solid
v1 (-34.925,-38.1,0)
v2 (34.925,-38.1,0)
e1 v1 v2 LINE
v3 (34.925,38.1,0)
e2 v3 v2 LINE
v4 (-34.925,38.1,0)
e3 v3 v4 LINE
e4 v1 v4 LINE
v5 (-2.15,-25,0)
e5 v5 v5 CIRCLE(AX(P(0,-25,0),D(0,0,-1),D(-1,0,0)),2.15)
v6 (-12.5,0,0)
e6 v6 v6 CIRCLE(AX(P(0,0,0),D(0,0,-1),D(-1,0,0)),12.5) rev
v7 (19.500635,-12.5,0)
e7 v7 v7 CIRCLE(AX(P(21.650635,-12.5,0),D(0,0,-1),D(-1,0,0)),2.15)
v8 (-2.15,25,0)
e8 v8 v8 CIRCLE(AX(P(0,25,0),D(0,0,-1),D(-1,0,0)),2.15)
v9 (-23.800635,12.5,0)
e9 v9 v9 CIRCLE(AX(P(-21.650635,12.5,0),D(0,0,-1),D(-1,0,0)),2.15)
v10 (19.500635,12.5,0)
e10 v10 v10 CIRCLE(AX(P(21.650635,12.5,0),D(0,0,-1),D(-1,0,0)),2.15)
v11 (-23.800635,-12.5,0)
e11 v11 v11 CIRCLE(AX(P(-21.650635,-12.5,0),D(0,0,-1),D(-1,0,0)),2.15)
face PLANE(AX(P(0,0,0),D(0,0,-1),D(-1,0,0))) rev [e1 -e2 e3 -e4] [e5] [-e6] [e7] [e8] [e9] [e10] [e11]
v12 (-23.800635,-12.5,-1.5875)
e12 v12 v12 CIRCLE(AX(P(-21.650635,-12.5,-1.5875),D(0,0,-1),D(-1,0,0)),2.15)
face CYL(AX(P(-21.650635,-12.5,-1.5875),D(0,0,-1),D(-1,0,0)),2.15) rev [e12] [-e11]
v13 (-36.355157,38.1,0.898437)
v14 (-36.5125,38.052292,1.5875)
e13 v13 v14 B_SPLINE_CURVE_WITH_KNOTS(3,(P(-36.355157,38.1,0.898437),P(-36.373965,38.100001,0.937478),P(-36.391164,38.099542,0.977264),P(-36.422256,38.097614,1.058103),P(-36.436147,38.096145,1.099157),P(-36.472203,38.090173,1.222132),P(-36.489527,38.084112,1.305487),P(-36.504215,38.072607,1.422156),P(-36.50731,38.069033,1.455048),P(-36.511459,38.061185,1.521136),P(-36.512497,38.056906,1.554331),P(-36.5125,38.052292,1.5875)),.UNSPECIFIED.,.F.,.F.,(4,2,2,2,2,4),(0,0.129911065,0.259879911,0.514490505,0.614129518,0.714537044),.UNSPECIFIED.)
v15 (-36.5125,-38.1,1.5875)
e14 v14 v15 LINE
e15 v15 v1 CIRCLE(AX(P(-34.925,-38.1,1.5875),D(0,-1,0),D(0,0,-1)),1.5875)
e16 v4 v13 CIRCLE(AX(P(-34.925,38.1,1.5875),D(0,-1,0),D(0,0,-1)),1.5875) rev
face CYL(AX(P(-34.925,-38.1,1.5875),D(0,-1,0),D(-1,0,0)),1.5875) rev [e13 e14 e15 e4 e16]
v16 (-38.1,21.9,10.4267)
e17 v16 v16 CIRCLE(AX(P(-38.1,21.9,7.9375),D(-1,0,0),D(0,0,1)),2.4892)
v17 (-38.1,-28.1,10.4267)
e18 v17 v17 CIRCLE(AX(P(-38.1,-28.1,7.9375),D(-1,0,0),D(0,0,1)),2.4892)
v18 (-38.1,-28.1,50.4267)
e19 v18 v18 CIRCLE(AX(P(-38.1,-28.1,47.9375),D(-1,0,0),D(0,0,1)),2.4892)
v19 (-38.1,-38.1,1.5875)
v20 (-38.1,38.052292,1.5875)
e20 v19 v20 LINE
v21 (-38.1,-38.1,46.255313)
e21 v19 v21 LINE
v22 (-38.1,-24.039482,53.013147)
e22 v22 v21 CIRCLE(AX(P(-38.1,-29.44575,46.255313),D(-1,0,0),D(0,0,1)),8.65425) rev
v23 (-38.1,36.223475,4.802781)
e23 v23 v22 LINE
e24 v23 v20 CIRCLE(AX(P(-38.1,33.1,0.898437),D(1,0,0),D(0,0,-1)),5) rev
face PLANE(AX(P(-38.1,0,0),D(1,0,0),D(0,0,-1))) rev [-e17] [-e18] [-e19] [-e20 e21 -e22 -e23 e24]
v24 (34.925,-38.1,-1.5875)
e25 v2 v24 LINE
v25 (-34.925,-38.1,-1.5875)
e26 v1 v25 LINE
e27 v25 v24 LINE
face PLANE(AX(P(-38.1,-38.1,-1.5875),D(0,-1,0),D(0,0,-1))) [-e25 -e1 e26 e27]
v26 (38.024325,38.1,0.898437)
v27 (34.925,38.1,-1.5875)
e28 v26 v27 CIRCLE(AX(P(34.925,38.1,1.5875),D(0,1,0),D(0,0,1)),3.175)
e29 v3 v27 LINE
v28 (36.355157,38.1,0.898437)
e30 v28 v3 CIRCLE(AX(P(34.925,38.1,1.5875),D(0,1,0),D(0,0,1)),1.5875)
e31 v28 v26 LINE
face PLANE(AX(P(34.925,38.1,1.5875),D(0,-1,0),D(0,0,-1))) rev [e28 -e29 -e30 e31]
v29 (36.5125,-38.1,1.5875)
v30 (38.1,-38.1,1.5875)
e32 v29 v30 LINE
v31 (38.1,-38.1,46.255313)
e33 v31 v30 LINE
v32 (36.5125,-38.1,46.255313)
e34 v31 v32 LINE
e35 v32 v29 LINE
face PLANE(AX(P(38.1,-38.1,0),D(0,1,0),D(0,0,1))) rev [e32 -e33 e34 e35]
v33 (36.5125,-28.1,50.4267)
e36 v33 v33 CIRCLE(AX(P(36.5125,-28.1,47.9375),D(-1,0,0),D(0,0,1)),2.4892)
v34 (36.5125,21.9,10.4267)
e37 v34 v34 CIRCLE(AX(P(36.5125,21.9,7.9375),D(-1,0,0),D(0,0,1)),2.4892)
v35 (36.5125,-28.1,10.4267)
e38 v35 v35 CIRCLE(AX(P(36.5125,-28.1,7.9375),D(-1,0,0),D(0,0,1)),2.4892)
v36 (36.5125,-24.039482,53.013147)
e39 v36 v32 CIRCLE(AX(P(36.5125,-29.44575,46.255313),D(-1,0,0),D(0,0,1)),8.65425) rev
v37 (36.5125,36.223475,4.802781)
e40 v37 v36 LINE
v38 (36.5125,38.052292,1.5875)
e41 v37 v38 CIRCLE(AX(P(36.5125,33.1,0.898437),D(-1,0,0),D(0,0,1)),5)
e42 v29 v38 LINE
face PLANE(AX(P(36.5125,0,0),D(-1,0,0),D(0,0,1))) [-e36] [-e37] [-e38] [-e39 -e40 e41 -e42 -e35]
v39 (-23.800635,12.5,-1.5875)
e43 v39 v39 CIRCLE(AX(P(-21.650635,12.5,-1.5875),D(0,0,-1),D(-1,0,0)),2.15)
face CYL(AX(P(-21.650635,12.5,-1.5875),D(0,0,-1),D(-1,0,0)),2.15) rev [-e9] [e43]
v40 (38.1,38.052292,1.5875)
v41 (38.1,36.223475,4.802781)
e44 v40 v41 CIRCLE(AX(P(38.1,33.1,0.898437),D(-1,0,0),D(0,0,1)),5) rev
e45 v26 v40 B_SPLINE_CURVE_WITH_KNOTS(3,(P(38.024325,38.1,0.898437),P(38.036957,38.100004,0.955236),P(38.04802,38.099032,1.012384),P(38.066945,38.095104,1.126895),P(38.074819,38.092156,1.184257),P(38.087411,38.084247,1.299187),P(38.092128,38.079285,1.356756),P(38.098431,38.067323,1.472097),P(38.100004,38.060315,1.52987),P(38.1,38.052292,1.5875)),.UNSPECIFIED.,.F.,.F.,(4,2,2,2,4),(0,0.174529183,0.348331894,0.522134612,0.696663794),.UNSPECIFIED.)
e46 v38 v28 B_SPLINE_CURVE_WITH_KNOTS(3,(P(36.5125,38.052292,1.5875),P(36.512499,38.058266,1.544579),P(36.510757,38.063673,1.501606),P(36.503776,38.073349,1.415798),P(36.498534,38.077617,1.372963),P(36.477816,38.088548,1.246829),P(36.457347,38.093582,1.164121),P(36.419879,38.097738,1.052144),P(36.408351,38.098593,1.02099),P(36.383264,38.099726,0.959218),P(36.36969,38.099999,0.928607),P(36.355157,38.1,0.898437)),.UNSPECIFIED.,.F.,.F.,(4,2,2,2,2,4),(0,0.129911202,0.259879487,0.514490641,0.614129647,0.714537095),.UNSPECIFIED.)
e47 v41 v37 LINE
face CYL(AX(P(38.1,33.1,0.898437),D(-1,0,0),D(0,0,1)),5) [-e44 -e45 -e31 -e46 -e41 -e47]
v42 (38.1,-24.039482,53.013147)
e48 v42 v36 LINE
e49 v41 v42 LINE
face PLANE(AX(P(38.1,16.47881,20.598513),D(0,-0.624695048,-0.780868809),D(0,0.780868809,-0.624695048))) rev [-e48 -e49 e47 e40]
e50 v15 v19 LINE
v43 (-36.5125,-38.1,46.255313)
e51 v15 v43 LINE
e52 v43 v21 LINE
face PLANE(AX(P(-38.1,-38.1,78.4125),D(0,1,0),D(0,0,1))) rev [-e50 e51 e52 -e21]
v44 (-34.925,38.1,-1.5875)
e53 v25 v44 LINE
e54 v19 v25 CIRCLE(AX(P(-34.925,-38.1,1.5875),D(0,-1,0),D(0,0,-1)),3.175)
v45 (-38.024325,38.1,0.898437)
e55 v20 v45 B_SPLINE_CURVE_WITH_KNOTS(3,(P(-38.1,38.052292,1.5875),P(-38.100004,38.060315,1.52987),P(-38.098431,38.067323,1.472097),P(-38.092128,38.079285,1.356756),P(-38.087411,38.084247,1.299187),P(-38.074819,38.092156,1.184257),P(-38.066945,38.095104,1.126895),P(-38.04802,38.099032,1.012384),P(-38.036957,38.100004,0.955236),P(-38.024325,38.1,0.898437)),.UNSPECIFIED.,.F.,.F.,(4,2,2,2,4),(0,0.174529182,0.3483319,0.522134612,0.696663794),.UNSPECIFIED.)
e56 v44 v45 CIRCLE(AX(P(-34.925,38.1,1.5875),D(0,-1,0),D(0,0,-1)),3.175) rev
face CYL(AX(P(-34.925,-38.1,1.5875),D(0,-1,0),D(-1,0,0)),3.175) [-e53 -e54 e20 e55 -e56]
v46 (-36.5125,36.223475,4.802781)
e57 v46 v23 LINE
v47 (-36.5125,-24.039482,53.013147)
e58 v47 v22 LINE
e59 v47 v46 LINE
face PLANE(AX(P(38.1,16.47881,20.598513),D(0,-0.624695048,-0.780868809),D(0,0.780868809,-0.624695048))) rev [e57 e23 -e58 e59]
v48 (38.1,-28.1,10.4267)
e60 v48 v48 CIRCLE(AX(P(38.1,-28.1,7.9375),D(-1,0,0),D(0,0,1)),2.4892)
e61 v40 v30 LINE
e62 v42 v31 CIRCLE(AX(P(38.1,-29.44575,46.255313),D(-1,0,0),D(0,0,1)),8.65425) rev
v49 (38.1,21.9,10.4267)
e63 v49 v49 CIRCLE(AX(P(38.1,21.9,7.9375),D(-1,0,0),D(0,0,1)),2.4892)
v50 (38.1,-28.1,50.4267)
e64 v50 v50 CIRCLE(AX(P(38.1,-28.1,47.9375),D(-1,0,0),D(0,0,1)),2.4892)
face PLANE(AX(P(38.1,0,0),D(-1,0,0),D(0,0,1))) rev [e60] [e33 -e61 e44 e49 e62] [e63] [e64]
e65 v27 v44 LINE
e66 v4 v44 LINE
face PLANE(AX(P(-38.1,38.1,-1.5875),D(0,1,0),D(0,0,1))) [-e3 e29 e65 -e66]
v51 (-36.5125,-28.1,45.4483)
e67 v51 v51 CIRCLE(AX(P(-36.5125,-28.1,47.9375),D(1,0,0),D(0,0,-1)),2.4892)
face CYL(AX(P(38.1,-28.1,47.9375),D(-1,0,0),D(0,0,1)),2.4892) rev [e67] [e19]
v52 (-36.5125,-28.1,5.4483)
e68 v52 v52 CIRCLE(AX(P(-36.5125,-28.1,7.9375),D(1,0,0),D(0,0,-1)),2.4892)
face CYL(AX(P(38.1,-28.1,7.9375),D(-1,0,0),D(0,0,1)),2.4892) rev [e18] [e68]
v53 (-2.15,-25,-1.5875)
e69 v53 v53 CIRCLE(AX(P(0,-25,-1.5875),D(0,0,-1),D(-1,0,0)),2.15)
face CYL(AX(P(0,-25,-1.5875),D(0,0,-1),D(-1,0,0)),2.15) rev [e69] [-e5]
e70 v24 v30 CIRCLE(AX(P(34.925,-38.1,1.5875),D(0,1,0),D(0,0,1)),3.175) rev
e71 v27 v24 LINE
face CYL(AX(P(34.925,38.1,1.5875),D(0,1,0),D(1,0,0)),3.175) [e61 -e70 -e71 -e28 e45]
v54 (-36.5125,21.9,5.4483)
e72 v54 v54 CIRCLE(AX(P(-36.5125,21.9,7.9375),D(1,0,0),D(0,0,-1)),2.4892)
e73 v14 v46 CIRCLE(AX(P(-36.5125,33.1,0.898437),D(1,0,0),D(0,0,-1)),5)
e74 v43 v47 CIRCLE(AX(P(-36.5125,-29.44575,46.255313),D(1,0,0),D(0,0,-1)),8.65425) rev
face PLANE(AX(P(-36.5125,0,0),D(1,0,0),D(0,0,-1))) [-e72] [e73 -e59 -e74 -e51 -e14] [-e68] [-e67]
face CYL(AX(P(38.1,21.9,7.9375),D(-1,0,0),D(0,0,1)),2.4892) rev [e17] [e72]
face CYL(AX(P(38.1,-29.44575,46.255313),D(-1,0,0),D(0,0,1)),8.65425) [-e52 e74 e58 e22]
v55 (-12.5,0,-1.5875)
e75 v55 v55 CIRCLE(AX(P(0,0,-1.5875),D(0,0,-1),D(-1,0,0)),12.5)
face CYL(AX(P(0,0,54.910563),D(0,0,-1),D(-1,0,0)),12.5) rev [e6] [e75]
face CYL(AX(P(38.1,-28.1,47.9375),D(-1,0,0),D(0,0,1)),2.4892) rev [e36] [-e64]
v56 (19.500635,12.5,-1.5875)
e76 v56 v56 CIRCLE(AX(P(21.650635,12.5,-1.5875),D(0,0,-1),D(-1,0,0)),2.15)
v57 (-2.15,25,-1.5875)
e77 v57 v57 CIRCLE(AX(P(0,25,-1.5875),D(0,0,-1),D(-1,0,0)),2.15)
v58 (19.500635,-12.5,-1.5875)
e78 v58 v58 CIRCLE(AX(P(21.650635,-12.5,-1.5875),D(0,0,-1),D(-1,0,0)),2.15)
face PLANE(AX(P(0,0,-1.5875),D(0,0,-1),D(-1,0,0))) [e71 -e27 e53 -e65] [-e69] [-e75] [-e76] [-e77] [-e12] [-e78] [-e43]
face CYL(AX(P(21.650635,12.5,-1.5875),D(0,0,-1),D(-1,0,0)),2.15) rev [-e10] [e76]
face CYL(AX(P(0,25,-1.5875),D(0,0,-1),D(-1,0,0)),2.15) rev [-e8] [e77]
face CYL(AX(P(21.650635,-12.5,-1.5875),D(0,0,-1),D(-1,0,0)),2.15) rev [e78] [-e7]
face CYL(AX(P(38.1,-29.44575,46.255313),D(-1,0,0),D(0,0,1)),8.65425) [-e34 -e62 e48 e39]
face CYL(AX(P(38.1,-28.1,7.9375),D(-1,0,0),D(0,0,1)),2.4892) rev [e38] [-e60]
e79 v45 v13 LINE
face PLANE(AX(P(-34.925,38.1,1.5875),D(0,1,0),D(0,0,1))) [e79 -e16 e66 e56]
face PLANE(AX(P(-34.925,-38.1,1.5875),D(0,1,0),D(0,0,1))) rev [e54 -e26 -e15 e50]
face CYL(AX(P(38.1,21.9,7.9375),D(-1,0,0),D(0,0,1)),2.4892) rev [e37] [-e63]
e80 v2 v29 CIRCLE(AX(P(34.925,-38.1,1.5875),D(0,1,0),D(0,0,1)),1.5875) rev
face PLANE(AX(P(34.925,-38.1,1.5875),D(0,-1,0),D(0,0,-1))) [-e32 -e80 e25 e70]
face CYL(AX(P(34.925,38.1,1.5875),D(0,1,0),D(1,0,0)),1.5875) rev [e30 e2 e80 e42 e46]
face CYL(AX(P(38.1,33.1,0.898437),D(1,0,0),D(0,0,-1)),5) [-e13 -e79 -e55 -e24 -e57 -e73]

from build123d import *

# Parameters (mm, degrees)
SKETCH1_W                      = 76.2
SKETCH1_H                      = 76.2
BASE_FLANGE1_DEPTH             = 1.5875
EDGE_FLANGE1_STRIP_W           = 9.525
EDGE_FLANGE1_STRIP_H           = 1.5875
EDGE_FLANGE1_STRIP_CUT_DEPTH   = 76.2
EDGE_FLANGE1_STRIP_2_W         = 9.525
EDGE_FLANGE1_STRIP_2_H         = 1.5875
EDGE_FLANGE1_STRIP_CUT_2_DEPTH = 76.2
EDGE_FLANGE1_DEPTH             = 76.2
EDGE_FLANGE1_BEND_DEPTH        = 76.2
UOR23_ARM_2_P_002_START        = -73.139044615
UOR23_ARM_2_P_002_OUTLINE_R    = 2.4892
UOR23_ARM_2_P_002_OUTLINE_R_2  = 15.875
UOR23_ARM_2_P_002_OUTLINE_R_3  = 4.7625
UOR23_ARM_2_P_002_DEPTH        = 4.7625
BODY_MOVE_COPY2_ANGLE          = 90
SKETCH19_R                     = 2.4892
CUT_EXTRUDE1_DEPTH             = 116.786744303
CUT_EXTRUDE2_REACH             = 80.071
SKETCH21_R                     = 12.5
M4_CLEARANCE_HOLE1_D           = 4.3
CIRPATTERN1_COUNT              = 6
FILLET1_R                      = 5


with BuildPart() as part:
    # Base-Flange1: sheet metal written as solids
    # Sketch1 → Base-Flange1 (new body)
    with BuildSketch(Plane.XY):
        Rectangle(SKETCH1_W, SKETCH1_H)
    extrude(amount=-BASE_FLANGE1_DEPTH)

    # Edge-Flange1: sheet metal written as solids
    # Edge-Flange1 strip (on a plane across the edge) → Edge-Flange1 strip cut (cut)
    with BuildSketch(Plane(origin=(-38.1, 38.1, 0), x_dir=(1, 0, 0), z_dir=(0, -1, 0))):
        with Locations((-1.5875, -0.79375)):
            Rectangle(EDGE_FLANGE1_STRIP_W, EDGE_FLANGE1_STRIP_H)
    extrude(amount=EDGE_FLANGE1_STRIP_CUT_DEPTH, mode=Mode.SUBTRACT)

    # Edge-Flange1 strip 2 (on a plane across the edge) → Edge-Flange1 strip cut 2 (cut)
    with BuildSketch(Plane(origin=(38.1, -38.1, 0), x_dir=(-1, 0, 0), z_dir=(0, 1, 0))):
        with Locations((-1.5875, -0.79375)):
            Rectangle(EDGE_FLANGE1_STRIP_2_W, EDGE_FLANGE1_STRIP_2_H)
    extrude(amount=EDGE_FLANGE1_STRIP_CUT_2_DEPTH, mode=Mode.SUBTRACT)

    # Edge-Flange1 section (on a plane across the edge) → Edge-Flange1 (add)
    with BuildSketch(Plane(origin=(-38.1, 38.1, 0), x_dir=(1, 0, 0), z_dir=(0, -1, 0))):
        with BuildLine():
            Line((0, 1.5875), (0, 78.4125))
            Line((0, 78.4125), (1.5875, 78.4125))
            Line((1.5875, 78.4125), (1.5875, 1.5875))
            ThreePointArc((1.5875, 1.5875), (2.052467985, 0.464967985), (3.175, 0))
            Line((3.175, 0), (3.175, -1.5875))
            ThreePointArc((3.175, -1.5875), (0.92993597, -0.65756403), (0, 1.5875))
        make_face()
    extrude(amount=EDGE_FLANGE1_DEPTH)

    # Edge-Flange1 section 2 (on a plane across the edge) → Edge-Flange1 bend (add)
    with BuildSketch(Plane(origin=(38.1, -38.1, 0), x_dir=(-1, 0, 0), z_dir=(0, 1, 0))):
        with BuildLine():
            Line((0, 1.5875), (0, 78.4125))
            Line((0, 78.4125), (1.5875, 78.4125))
            Line((1.5875, 78.4125), (1.5875, 1.5875))
            ThreePointArc((1.5875, 1.5875), (2.052467985, 0.464967985), (3.175, 0))
            Line((3.175, 0), (3.175, -1.5875))
            ThreePointArc((3.175, -1.5875), (0.92993597, -0.65756403), (0, 1.5875))
        make_face()
    extrude(amount=EDGE_FLANGE1_BEND_DEPTH)

    # Sketch19 → Cut-Extrude1 (cut, through all)
    with BuildSketch(Plane.ZY.offset(38.1)):
        with Locations((47.9375, -28.1)):
            Circle(SKETCH19_R)
        with Locations((7.9375, -28.1)):
            Circle(SKETCH19_R)
        with Locations((7.9375, 21.9)):
            Circle(SKETCH19_R)
        with BuildLine():
            Line((44.814024762, -13.790579067), (23.287818675, 13.117178542))
            Line((23.287818675, 13.117178542), (3.301561509, 38.1))
            Line((3.301561509, 38.1), (78.4125, 38.1))
            Line((78.4125, 38.1), (78.4125, -38.1))
            Line((78.4125, -38.1), (62.182318934, -38.1))
            Line((62.182318934, -38.1), (46.255313034, -38.1))
            ThreePointArc((46.255313034, -38.1), (54.055416951, -33.194673329), (53.013147261, -24.039482191))
            Line((53.013147261, -24.039482191), (44.814024762, -13.790579067))
        make_face()
    extrude(amount=-CUT_EXTRUDE1_DEPTH, mode=Mode.SUBTRACT)

    # Sketch21 → Cut-Extrude2 (cut, up to next)
    with BuildSketch(Plane(origin=(0, 0, -1.5875), x_dir=(-1, 0, 0), z_dir=(0, 0, -1)), mode=Mode.PRIVATE) as cut_extrude2_sk1:
        Circle(SKETCH21_R)
    cut_extrude2_tool1 = extrude(cut_extrude2_sk1.sketch, amount=-CUT_EXTRUDE2_REACH, mode=Mode.PRIVATE) & part.part
    add(cut_extrude2_tool1.solids().sort_by_distance((0, 0, -1.5875))[0], mode=Mode.SUBTRACT)

    # M4 Clearance Hole1 (through all)
    with Locations(Plane(origin=(0, 0, -1.5875), x_dir=(-1, 0, 0), z_dir=(0, 0, -1))):
        with Locations((0, 25)):
            m4_clearance_hole1 = Hole(M4_CLEARANCE_HOLE1_D / 2)

    # CirPattern1: M4 Clearance Hole1 ×6 about axis
    cirpattern1_axis = Axis((0, 0, 0), (0, 0, 1))
    for i in range(1, CIRPATTERN1_COUNT):
        add(m4_clearance_hole1.rotate(cirpattern1_axis, i * 360 / CIRPATTERN1_COUNT), mode=Mode.SUBTRACT)

    # Fillet1
    fillet1_edges = [part.edges().sort_by_distance(p)[0] for p in [
        (-37.30625, 38.1, 3.301561509),
        (37.30625, 38.1, 3.301561509),
    ]]
    fillet(fillet1_edges, radius=FILLET1_R)


with BuildPart() as body_2:
    # UOR23-ARM-2-P-002: read off the stored shape, not the designer's step
    # UOR23-ARM-2-P-002 outline → UOR23-ARM-2-P-002 (new body)
    with BuildSketch(Plane.XY.offset(UOR23_ARM_2_P_002_START)):
        with BuildLine():
            Line((-606.620760236, 28.959751689), (-512.767628332, 6.9035095))
            ThreePointArc((-512.767628332, 6.9035095), (-508.790869183, 6.208113422), (-504.760487237, 5.97528215))
            Line((-504.760487237, 5.97528215), (-79.760487237, 5.97528215))
            Line((-79.760487237, 5.97528215), (-79.760487237, 75.97528215))
            Line((-79.760487237, 75.97528215), (-504.760487237, 75.97528215))
            ThreePointArc((-504.760487237, 75.97528215), (-507.955084638, 75.829185051), (-511.123012244, 75.392113432))
            Line((-511.123012244, 75.392113432), (-605.926632805, 57.866083751))
            ThreePointArc((-605.926632805, 57.866083751), (-618.009121698, 43.694720355), (-606.620760236, 28.959751689))
        make_face()
        with Locations((-446.110487237, 15.97528215)):
            Circle(UOR23_ARM_2_P_002_OUTLINE_R, mode=Mode.SUBTRACT)
        with Locations((-366.110487237, 15.97528215)):
            Circle(UOR23_ARM_2_P_002_OUTLINE_R, mode=Mode.SUBTRACT)
        with Locations((-504.760487237, 40.97528215)):
            Circle(UOR23_ARM_2_P_002_OUTLINE_R_2, mode=Mode.SUBTRACT)
        with BuildLine():
            Line((-430.760168562, 24.758103607), (-409.233962474, 51.665861217))
            ThreePointArc((-409.233962474, 51.665861217), (-406.110487236, 53.167081026), (-402.987011999, 51.665861217))
            Line((-402.987011999, 51.665861217), (-381.460805912, 24.758103607))
            ThreePointArc((-381.460805912, 24.758103607), (-380.979068204, 20.526568495), (-384.584281149, 18.259323417))
            Line((-384.584281149, 18.259323417), (-427.636693324, 18.259323417))
            ThreePointArc((-427.636693324, 18.259323417), (-431.241906269, 20.526568495), (-430.760168562, 24.758103607))
        make_face(mode=Mode.SUBTRACT)
        with Locations((-286.110487237, 15.97528215)):
            Circle(UOR23_ARM_2_P_002_OUTLINE_R, mode=Mode.SUBTRACT)
        with Locations((-206.110487237, 15.97528215)):
            Circle(UOR23_ARM_2_P_002_OUTLINE_R, mode=Mode.SUBTRACT)
        with Locations((-126.110487237, 15.97528215)):
            Circle(UOR23_ARM_2_P_002_OUTLINE_R, mode=Mode.SUBTRACT)
        with Locations((-86.110487237, 15.97528215)):
            Circle(UOR23_ARM_2_P_002_OUTLINE_R, mode=Mode.SUBTRACT)
        with BuildLine():
            Line((-350.760168562, 24.758103607), (-329.233962474, 51.665861217))
            ThreePointArc((-329.233962474, 51.665861217), (-326.110487236, 53.167081026), (-322.987011999, 51.665861217))
            Line((-322.987011999, 51.665861217), (-301.460805912, 24.758103607))
            ThreePointArc((-301.460805912, 24.758103607), (-300.979068204, 20.526568495), (-304.584281149, 18.259323417))
            Line((-304.584281149, 18.259323417), (-347.636693324, 18.259323417))
            ThreePointArc((-347.636693324, 18.259323417), (-351.241906269, 20.526568495), (-350.760168562, 24.758103607))
        make_face(mode=Mode.SUBTRACT)
        with BuildLine():
            Line((-270.760168562, 24.758103607), (-249.233962474, 51.665861217))
            ThreePointArc((-249.233962474, 51.665861217), (-246.110487237, 53.167081026), (-242.987011999, 51.665861217))
            Line((-242.987011999, 51.665861217), (-221.460805912, 24.758103607))
            ThreePointArc((-221.460805912, 24.758103607), (-220.979068204, 20.526568495), (-224.584281149, 18.259323417))
            Line((-224.584281149, 18.259323417), (-267.636693324, 18.259323417))
            ThreePointArc((-267.636693324, 18.259323417), (-271.241906269, 20.526568495), (-270.760168562, 24.758103607))
        make_face(mode=Mode.SUBTRACT)
        with BuildLine():
            Line((-190.760168562, 24.758103607), (-169.233962474, 51.665861217))
            ThreePointArc((-169.233962474, 51.665861217), (-166.110487237, 53.167081026), (-162.987011999, 51.665861217))
            Line((-162.987011999, 51.665861217), (-141.460805912, 24.758103607))
            ThreePointArc((-141.460805912, 24.758103607), (-140.979068204, 20.526568495), (-144.584281149, 18.259323417))
            Line((-144.584281149, 18.259323417), (-187.636693324, 18.259323417))
            ThreePointArc((-187.636693324, 18.259323417), (-191.241906269, 20.526568495), (-190.760168562, 24.758103607))
        make_face(mode=Mode.SUBTRACT)
        with Locations((-603.241262538, 43.340099916)):
            Circle(UOR23_ARM_2_P_002_OUTLINE_R_3, mode=Mode.SUBTRACT)
        with BuildLine():
            ThreePointArc((-442.987011999, 30.284703083), (-446.110487236, 28.783483273), (-449.233962474, 30.284703083))
            Line((-449.233962474, 30.284703083), (-470.760168562, 57.192460692))
            ThreePointArc((-470.760168562, 57.192460692), (-471.241906269, 61.423995804), (-467.636693324, 63.691240882))
            Line((-467.636693324, 63.691240882), (-424.584281149, 63.691240882))
            ThreePointArc((-424.584281149, 63.691240882), (-420.979068204, 61.423995804), (-421.460805912, 57.192460692))
            Line((-421.460805912, 57.192460692), (-442.987011999, 30.284703083))
        make_face(mode=Mode.SUBTRACT)
        with BuildLine():
            ThreePointArc((-362.987011999, 30.284703083), (-366.110487236, 28.783483273), (-369.233962474, 30.284703083))
            Line((-369.233962474, 30.284703083), (-390.760168562, 57.192460692))
            ThreePointArc((-390.760168562, 57.192460692), (-391.241906269, 61.423995804), (-387.636693324, 63.691240882))
            Line((-387.636693324, 63.691240882), (-344.584281149, 63.691240882))
            ThreePointArc((-344.584281149, 63.691240882), (-340.979068204, 61.423995804), (-341.460805912, 57.192460692))
            Line((-341.460805912, 57.192460692), (-362.987011999, 30.284703083))
        make_face(mode=Mode.SUBTRACT)
        with Locations((-406.110487237, 65.97528215)):
            Circle(UOR23_ARM_2_P_002_OUTLINE_R, mode=Mode.SUBTRACT)
        with BuildLine():
            ThreePointArc((-282.987011999, 30.284703083), (-286.110487236, 28.783483273), (-289.233962474, 30.284703083))
            Line((-289.233962474, 30.284703083), (-310.760168562, 57.192460692))
            ThreePointArc((-310.760168562, 57.192460692), (-311.241906269, 61.423995804), (-307.636693324, 63.691240882))
            Line((-307.636693324, 63.691240882), (-264.584281149, 63.691240882))
            ThreePointArc((-264.584281149, 63.691240882), (-260.979068204, 61.423995804), (-261.460805912, 57.192460692))
            Line((-261.460805912, 57.192460692), (-282.987011999, 30.284703083))
        make_face(mode=Mode.SUBTRACT)
        with BuildLine():
            ThreePointArc((-202.987011999, 30.284703083), (-206.110487237, 28.783483273), (-209.233962474, 30.284703083))
            Line((-209.233962474, 30.284703083), (-230.760168562, 57.192460692))
            ThreePointArc((-230.760168562, 57.192460692), (-231.241906269, 61.423995804), (-227.636693324, 63.691240882))
            Line((-227.636693324, 63.691240882), (-184.584281149, 63.691240882))
            ThreePointArc((-184.584281149, 63.691240882), (-180.979068204, 61.423995804), (-181.460805912, 57.192460692))
            Line((-181.460805912, 57.192460692), (-202.987011999, 30.284703083))
        make_face(mode=Mode.SUBTRACT)
        with BuildLine():
            ThreePointArc((-122.987011999, 30.284703083), (-126.110487237, 28.783483273), (-129.233962474, 30.284703083))
            Line((-129.233962474, 30.284703083), (-150.760168562, 57.192460692))
            ThreePointArc((-150.760168562, 57.192460692), (-151.241906269, 61.423995804), (-147.636693324, 63.691240882))
            Line((-147.636693324, 63.691240882), (-104.584281149, 63.691240882))
            ThreePointArc((-104.584281149, 63.691240882), (-100.979068204, 61.423995804), (-101.460805912, 57.192460692))
            Line((-101.460805912, 57.192460692), (-122.987011999, 30.284703083))
        make_face(mode=Mode.SUBTRACT)
        with Locations((-326.110487237, 65.97528215)):
            Circle(UOR23_ARM_2_P_002_OUTLINE_R, mode=Mode.SUBTRACT)
        with Locations((-246.110487237, 65.97528215)):
            Circle(UOR23_ARM_2_P_002_OUTLINE_R, mode=Mode.SUBTRACT)
        with Locations((-166.110487237, 65.97528215)):
            Circle(UOR23_ARM_2_P_002_OUTLINE_R, mode=Mode.SUBTRACT)
        with Locations((-86.110487237, 65.97528215)):
            Circle(UOR23_ARM_2_P_002_OUTLINE_R, mode=Mode.SUBTRACT)
    extrude(amount=UOR23_ARM_2_P_002_DEPTH)


with BuildPart() as body_2_1:
    # Body-Move/Copy2: read off the stored shape, not the designer's step
    # Body-Move/Copy2: moved
    add(body_2.part.moved(Location((78.1729872, -44.0752821, 30.2765446))).rotate(Axis((0, 0, 0), (0, 1, 0)), BODY_MOVE_COPY2_ANGLE))


solid = part.part
